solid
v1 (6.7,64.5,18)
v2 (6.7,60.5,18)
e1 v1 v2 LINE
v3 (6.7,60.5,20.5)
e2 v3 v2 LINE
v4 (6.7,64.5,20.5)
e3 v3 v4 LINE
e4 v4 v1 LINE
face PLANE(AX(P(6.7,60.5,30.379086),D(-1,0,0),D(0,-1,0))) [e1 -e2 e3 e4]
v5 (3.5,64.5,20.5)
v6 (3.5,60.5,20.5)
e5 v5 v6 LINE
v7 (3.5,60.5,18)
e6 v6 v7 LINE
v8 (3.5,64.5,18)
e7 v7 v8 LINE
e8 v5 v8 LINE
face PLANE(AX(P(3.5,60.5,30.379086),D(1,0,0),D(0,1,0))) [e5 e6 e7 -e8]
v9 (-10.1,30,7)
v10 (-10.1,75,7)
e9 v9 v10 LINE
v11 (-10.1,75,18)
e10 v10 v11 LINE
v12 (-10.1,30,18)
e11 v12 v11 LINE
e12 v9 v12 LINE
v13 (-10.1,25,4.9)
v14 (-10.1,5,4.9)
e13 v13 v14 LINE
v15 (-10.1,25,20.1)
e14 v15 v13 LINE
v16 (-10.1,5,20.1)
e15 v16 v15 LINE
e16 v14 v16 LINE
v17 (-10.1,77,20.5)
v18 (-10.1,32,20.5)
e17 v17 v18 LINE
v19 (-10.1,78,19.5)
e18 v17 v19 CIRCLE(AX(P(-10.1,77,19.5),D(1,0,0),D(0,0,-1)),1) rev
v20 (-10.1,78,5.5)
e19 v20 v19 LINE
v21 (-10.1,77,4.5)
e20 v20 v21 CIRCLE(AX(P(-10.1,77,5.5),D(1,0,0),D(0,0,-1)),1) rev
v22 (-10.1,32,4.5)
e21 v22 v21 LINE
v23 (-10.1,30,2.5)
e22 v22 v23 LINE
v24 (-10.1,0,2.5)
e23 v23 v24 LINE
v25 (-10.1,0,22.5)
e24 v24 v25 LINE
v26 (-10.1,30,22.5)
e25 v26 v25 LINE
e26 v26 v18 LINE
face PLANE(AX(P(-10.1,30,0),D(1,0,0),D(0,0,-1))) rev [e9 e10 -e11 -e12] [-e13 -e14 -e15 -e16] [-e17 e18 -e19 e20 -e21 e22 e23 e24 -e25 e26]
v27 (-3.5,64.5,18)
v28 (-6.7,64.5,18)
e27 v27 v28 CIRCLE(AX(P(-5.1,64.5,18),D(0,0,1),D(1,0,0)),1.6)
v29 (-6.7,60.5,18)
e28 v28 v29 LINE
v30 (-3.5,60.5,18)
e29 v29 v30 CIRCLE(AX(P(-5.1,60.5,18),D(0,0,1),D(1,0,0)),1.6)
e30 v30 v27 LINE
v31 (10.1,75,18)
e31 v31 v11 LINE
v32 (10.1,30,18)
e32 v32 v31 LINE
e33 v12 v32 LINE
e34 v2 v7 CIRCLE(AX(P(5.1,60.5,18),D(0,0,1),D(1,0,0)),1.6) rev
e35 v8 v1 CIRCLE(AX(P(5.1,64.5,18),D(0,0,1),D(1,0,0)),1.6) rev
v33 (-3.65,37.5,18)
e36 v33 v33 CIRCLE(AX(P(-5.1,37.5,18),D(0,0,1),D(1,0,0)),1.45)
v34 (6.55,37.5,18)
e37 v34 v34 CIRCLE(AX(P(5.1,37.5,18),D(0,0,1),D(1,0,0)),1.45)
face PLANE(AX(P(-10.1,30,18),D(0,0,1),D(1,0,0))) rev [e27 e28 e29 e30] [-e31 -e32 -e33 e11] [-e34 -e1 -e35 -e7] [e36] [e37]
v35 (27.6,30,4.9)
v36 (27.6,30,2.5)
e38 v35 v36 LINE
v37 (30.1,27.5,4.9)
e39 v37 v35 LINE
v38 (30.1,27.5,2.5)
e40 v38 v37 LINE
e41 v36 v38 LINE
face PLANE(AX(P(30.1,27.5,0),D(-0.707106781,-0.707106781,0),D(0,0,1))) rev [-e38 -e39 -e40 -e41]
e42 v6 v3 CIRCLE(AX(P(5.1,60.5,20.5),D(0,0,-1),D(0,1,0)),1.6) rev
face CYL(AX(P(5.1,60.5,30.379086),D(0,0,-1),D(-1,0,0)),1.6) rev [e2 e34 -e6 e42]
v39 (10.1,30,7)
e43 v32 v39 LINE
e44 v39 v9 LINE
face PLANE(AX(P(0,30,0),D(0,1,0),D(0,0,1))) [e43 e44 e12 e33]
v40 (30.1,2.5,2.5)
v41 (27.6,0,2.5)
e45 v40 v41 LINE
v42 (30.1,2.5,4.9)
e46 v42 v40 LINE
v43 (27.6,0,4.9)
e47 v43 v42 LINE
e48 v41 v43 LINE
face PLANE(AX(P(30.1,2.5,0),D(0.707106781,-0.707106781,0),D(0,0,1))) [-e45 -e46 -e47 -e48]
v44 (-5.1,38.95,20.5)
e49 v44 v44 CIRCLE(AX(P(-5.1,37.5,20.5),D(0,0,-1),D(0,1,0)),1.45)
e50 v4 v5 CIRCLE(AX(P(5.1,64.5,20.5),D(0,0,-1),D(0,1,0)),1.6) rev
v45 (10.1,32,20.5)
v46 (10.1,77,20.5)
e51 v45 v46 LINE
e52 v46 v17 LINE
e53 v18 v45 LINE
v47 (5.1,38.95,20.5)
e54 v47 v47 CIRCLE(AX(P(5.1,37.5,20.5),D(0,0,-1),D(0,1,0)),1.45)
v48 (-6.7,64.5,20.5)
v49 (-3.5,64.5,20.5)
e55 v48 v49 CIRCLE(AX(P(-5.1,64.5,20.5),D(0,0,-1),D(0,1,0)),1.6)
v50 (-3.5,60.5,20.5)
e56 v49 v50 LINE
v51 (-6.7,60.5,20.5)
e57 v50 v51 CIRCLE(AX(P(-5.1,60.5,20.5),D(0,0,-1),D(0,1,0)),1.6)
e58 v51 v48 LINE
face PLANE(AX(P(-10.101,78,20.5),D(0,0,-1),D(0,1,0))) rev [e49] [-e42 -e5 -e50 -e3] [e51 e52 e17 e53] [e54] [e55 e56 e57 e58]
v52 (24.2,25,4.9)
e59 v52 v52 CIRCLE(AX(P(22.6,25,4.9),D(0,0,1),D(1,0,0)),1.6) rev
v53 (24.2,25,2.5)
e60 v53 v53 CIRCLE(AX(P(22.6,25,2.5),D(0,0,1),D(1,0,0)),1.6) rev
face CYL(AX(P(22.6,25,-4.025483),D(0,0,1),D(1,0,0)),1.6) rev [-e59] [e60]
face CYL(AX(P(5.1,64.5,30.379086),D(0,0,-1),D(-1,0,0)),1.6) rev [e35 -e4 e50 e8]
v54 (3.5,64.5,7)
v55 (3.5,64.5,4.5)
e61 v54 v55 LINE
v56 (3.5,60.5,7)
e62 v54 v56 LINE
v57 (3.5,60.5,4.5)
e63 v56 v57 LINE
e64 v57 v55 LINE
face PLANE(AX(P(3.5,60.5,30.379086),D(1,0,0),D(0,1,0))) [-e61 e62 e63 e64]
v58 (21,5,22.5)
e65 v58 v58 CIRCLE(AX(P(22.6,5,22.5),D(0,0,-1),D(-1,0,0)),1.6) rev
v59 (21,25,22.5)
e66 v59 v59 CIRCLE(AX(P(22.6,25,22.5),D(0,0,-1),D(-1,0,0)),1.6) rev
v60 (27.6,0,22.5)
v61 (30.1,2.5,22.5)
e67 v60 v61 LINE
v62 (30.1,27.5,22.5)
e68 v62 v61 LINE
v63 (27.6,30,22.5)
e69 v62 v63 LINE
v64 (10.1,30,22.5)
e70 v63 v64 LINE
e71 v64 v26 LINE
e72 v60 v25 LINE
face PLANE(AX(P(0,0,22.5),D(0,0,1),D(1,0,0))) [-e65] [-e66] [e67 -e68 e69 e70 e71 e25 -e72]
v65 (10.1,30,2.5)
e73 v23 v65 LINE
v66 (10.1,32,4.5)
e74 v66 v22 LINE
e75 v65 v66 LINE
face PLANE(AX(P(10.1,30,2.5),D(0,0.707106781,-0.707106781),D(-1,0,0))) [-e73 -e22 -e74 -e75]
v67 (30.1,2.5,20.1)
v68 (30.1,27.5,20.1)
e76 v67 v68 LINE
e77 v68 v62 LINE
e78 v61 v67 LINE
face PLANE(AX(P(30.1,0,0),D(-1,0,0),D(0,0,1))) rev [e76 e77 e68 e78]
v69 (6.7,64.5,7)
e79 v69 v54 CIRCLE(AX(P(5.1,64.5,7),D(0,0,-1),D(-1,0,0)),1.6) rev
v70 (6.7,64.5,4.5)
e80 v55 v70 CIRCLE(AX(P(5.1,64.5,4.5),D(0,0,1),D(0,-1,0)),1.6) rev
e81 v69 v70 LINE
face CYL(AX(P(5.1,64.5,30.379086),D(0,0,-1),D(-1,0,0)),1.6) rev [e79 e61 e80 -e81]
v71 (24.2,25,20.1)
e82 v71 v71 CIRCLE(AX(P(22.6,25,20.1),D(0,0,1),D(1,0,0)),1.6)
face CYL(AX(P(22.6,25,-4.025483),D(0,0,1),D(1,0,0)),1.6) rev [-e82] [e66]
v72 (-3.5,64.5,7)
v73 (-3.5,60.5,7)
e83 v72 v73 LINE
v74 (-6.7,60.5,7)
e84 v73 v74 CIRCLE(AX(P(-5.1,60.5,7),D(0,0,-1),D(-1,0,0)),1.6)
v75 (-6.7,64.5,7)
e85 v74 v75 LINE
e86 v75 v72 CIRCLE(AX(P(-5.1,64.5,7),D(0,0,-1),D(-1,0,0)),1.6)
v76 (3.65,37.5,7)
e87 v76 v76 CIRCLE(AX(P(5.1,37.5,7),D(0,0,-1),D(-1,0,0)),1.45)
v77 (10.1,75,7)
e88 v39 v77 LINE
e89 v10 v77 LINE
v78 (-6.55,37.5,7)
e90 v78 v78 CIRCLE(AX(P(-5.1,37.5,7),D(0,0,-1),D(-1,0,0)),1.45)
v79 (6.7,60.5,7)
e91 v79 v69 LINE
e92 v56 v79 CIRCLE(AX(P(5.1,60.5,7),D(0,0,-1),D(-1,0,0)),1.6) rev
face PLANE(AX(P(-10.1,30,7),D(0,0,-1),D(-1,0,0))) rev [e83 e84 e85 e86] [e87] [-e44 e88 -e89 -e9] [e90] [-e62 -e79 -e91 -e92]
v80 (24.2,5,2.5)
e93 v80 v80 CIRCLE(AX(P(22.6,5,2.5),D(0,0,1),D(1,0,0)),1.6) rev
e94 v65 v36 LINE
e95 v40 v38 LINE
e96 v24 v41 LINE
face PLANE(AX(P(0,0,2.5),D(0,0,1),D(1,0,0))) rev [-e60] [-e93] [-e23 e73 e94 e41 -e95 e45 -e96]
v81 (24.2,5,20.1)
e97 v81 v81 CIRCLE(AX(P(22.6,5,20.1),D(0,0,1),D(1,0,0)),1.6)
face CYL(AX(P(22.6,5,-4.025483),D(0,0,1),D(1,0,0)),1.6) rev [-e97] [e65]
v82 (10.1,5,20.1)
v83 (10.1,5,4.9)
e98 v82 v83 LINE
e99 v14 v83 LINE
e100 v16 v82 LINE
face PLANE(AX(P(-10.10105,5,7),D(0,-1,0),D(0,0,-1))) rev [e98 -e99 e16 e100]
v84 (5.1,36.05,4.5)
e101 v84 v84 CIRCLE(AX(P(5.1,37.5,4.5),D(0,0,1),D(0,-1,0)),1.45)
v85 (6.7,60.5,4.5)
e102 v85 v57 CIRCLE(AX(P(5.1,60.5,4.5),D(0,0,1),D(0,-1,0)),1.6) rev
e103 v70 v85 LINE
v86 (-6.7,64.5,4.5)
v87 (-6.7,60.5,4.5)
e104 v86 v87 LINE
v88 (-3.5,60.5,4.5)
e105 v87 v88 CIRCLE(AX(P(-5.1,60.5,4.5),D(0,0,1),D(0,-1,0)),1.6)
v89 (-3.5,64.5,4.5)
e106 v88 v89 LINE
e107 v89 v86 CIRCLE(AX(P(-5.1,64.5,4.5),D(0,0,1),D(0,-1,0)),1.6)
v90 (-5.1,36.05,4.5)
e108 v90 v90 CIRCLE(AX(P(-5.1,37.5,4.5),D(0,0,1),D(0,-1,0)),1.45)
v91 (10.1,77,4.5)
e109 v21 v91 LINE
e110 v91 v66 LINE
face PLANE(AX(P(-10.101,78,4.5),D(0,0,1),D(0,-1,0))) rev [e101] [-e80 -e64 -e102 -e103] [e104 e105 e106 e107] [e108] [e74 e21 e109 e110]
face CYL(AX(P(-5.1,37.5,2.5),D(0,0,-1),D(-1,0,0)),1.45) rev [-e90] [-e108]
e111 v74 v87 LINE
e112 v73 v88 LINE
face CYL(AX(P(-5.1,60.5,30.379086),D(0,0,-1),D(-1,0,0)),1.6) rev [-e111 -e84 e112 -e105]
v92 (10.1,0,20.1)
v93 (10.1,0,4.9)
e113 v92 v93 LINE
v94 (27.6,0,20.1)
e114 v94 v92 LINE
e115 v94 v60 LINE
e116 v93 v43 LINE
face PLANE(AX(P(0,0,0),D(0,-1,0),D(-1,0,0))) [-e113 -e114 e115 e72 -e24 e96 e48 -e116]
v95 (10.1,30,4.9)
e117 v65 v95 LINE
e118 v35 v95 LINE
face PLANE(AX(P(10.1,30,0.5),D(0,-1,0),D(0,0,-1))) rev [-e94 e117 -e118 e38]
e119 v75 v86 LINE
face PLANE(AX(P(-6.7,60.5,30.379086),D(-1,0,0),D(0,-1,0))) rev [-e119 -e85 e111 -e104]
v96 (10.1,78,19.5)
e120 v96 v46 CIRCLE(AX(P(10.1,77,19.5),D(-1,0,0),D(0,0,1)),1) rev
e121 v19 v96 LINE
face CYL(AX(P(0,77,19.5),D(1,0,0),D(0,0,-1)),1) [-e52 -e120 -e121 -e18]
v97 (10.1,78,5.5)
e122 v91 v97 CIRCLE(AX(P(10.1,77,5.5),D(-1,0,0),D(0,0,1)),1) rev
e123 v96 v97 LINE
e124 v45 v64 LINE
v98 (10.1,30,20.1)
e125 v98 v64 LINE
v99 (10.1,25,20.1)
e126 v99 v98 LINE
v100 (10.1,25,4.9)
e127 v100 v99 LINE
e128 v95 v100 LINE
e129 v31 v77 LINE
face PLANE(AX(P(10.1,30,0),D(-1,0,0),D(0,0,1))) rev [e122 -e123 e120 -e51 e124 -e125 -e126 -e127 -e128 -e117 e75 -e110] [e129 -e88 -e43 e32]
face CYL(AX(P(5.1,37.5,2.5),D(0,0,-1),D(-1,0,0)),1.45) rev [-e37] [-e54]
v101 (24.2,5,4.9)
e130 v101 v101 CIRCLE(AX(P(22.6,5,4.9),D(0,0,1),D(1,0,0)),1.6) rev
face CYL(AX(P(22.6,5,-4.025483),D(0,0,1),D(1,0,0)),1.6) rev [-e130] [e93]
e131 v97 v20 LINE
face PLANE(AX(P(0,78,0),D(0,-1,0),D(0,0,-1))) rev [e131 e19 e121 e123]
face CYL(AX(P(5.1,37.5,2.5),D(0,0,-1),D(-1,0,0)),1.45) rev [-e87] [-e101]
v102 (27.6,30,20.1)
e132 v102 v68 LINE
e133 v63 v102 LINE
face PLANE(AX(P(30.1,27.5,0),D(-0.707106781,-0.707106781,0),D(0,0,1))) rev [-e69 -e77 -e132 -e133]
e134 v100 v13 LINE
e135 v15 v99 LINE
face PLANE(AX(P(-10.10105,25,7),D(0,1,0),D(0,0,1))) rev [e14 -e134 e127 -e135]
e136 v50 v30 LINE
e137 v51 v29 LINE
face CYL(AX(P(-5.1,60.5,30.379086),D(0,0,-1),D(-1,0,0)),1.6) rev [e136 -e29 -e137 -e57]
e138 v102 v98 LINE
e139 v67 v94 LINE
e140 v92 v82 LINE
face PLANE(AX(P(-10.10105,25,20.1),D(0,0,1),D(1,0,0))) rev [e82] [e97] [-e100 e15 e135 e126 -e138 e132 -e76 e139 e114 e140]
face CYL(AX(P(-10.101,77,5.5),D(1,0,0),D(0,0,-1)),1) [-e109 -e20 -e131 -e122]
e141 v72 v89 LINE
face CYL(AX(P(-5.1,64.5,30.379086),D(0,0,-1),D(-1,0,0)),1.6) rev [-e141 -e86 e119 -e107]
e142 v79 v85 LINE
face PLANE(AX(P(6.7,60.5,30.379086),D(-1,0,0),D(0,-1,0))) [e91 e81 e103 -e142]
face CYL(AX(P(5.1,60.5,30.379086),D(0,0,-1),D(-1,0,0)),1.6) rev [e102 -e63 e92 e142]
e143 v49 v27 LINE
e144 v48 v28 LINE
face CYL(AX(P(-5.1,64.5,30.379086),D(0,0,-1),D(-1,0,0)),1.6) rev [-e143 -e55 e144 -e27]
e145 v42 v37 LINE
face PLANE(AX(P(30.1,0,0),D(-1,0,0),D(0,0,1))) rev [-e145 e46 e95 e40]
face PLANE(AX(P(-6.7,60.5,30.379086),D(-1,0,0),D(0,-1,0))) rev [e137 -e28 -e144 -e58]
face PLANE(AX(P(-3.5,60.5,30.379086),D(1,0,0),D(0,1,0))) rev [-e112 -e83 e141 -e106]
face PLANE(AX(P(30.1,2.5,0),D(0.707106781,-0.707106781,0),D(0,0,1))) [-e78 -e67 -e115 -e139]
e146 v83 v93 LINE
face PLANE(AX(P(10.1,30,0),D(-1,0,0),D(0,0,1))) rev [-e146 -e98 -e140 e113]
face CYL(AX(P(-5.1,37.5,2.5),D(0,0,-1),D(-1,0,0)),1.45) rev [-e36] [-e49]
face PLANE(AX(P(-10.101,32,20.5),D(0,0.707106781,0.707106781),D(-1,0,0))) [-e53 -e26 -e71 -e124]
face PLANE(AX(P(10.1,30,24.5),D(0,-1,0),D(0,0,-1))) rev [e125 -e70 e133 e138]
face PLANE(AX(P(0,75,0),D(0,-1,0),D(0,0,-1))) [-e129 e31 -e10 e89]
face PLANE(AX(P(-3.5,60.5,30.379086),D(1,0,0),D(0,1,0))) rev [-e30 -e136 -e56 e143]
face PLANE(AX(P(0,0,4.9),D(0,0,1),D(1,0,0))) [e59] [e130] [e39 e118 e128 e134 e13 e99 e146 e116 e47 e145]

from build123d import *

# Parameters (mm, degrees)
EXTRUDE_1_DEPTH      = 30
SKETCH_2_W           = 20.2
SKETCH_2_H           = 50
EXTRUDE_1_2_DEPTH    = 20
SKETCH_3_W           = 20.2
SKETCH_3_H           = 11
CUT_EXTRUDE_1_DEPTH  = 20
CUT_EXTRUDE_2_REACH  = 60.432
SKETCH_4_W           = 11
SKETCH_4_H           = 20
SKETCH_5_W           = 20.2
SKETCH_5_H           = 4.5
EXTRUDE_2_DEPTH      = 25
CUT_EXTRUDE_4_REACH  = 80.275
CUT_EXTRUDE_5_REACH  = 82.278
SKETCH_9_R           = 1.6
SKETCH_10_W          = 20.2
SKETCH_10_H          = 20
EXTRUDE_3_DEPTH      = 3
CUT_EXTRUDE_6_REACH  = 55.965
SKETCH_12_W          = 20.2
SKETCH_12_H          = 30
EXTRUDE_4_DEPTH      = 2
SKETCH_13_W          = 20.2
SKETCH_13_H          = 30
EXTRUDE_5_DEPTH      = 2
CUT_EXTRUDE_START    = -20.2
SKETCH_15_W          = 15.2
SKETCH_15_H          = 20
CUT_EXTRUDE_7_DEPTH  = 20.2
SKETCH_16_W          = 4.4
SKETCH_16_H          = 30
SKETCH_16_W_2        = 5.4
EXTRUDE_6_DEPTH      = 20
CUT_EXTRUDE_8_REACH  = 88.983
SKETCH_17_R          = 1.6
CHAMFER_1_SIZE       = 2.5
CUT_EXTRUDE_9_REACH  = 89.122
SKETCH_18_W          = 46.30929367
SKETCH_18_H          = 3
SKETCH_20_W          = 20.2
SKETCH_20_H          = 20
EXTRUDE_7_DEPTH      = 2.1
SKETCH_21_W          = 20.2
SKETCH_21_H          = 20
EXTRUDE_8_DEPTH      = 2.1
SKETCH_22_W          = 46.206629154
SKETCH_22_H          = 1
CUT_EXTRUDE_10_DEPTH = 30
SKETCH_23_W          = 42.922328926
SKETCH_23_H          = 4
CUT_EXTRUDE_11_DEPTH = 30
CUT_EXTRUDE_12_REACH = 85.656
SKETCH_24_W          = 4
SKETCH_24_H          = 48
SKETCH_25_W          = 15.2
SKETCH_25_H          = 20
CUT_EXTRUDE_13_DEPTH = 20.2
SKETCH_26_W          = 20.2
SKETCH_26_H          = 20
EXTRUDE_9_DEPTH      = 1
CHAMFER_2_SIZE       = 2
FILLET_1_R           = 1
CUT_EXTRUDE_14_DEPTH = 1


with BuildPart() as part:
    # 草图1 → Extrude 1 (new body)
    with BuildSketch(Plane(origin=(0, 0, 0), x_dir=(1, 0, 0), z_dir=(0, 1, 0))):
        Polygon((-7.6, 15), (-7.6, 0), (7.6, 0), (7.6, 15), (10.1, 15), (10.1, -2.5), (-10.1, -2.5), (-10.1, 15), align=None)
    extrude(amount=EXTRUDE_1_DEPTH)

    # 草图2 → Extrude 1 2 (add)
    with BuildSketch(Plane.XY.offset(2.5)):
        with Locations((0, 25)):
            Rectangle(SKETCH_2_W, SKETCH_2_H)
    extrude(amount=EXTRUDE_1_2_DEPTH)

    # 草图3 → 切除-拉伸1 (cut)
    with BuildSketch(Plane(origin=(0, 50, 0), x_dir=(1, 0, 0), z_dir=(0, 1, 0))):
        with Locations((0, -12.5)):
            Rectangle(SKETCH_3_W, SKETCH_3_H)
    extrude(amount=-CUT_EXTRUDE_1_DEPTH, mode=Mode.SUBTRACT)

    # 草图4 → 切除-拉伸2 (cut, up to next)
    with BuildSketch(Plane(origin=(10.1, 0, 0), x_dir=(0, 0, -1), z_dir=(1, 0, 0)), mode=Mode.PRIVATE) as cut_extrude_2_sk1:
        with Locations((-12.5, 15)):
            Rectangle(SKETCH_4_W, SKETCH_4_H)
    cut_extrude_2_tool1 = extrude(cut_extrude_2_sk1.sketch, amount=-CUT_EXTRUDE_2_REACH, mode=Mode.PRIVATE) & part.part
    add(cut_extrude_2_tool1.solids().sort_by_distance((10.1, 15, 12.5))[0], mode=Mode.SUBTRACT)

    # 草图5 → 凸台-拉伸2 (add)
    with BuildSketch(Plane(origin=(0, 50, 0), x_dir=(1, 0, 0), z_dir=(0, 1, 0))):
        with Locations((0, -4.75)):
            Rectangle(SKETCH_5_W, SKETCH_5_H)
        with Locations((0, -20.25)):
            Rectangle(SKETCH_5_W, SKETCH_5_H)
    extrude(amount=EXTRUDE_2_DEPTH)

    # 草图7 → M3.5 螺纹孔1 (revolve, cut)
    with BuildSketch(Plane(origin=(-5.1, 37.5, 2.5), x_dir=(0, 1, 0), z_dir=(1, 0, 0))):
        Polygon((0, 0), (0, 40.871247898), (1.45, 40), (1.45, 0), align=None)
    hole_wizard_m3_5_1 = revolve(axis=Axis((-5.1, 37.5, -3.85), (0, 0, 1)), mode=Mode.SUBTRACT)

    # 切除-拉伸4: up to this face of the body (flat: up to its plane)
    cut_extrude_4_end = Plane(part.part.faces().sort_by_distance((0.022332689, 37.5, 22.5))[0])
    # 草图8 → 切除-拉伸4 (cut, up to the picked face)
    with BuildSketch(Plane(origin=(0, 0, 2.5), x_dir=(-1, 0, 0), z_dir=(0, 0, -1)), mode=Mode.PRIVATE) as cut_extrude_4_sk1:
        with BuildLine():
            Line((3.5, 60.5), (3.5, 64.5))
            ThreePointArc((3.5, 64.5), (5.1, 66.1), (6.7, 64.5))
            Line((6.7, 64.5), (6.7, 60.5))
            ThreePointArc((6.7, 60.5), (5.1, 58.9), (3.5, 60.5))
        make_face()
    cut_extrude_4_tool1 = split(extrude(cut_extrude_4_sk1.sketch, amount=-CUT_EXTRUDE_4_REACH, mode=Mode.PRIVATE), bisect_by=cut_extrude_4_end, keep=Keep.BOTH, mode=Mode.PRIVATE)
    cut_extrude_4 = cut_extrude_4_tool1.solids().sort_by(Axis((-5.1, 62.5, 2.5), (0, 0, 1)))[0]
    add(cut_extrude_4, mode=Mode.SUBTRACT)

    # 草图9 → 切除-拉伸5 (cut, up to next)
    with BuildSketch(Plane(origin=(-7.6, 0, 0), x_dir=(0, 0, -1), z_dir=(1, 0, 0)), mode=Mode.PRIVATE) as cut_extrude_5_sk1:
        with Locations((7.5, 25)):
            Circle(SKETCH_9_R)
    cut_extrude_5_tool1 = extrude(cut_extrude_5_sk1.sketch, amount=-CUT_EXTRUDE_5_REACH, mode=Mode.PRIVATE) & part.part
    # 草图9 → 切除-拉伸5 (cut, up to next)
    with BuildSketch(Plane(origin=(-7.6, 0, 0), x_dir=(0, 0, -1), z_dir=(1, 0, 0)), mode=Mode.PRIVATE) as cut_extrude_5_sk2:
        with Locations((7.5, 5)):
            Circle(SKETCH_9_R)
    cut_extrude_5_tool2 = extrude(cut_extrude_5_sk2.sketch, amount=-CUT_EXTRUDE_5_REACH, mode=Mode.PRIVATE) & part.part
    cut_extrude_5_1 = cut_extrude_5_tool1.solids().sort_by_distance((-7.6, 25, -7.5))[0]
    add(cut_extrude_5_1, mode=Mode.SUBTRACT)
    cut_extrude_5_2 = cut_extrude_5_tool2.solids().sort_by_distance((-7.6, 5, -7.5))[0]
    add(cut_extrude_5_2, mode=Mode.SUBTRACT)
    cut_extrude_5 = cut_extrude_5_1 + cut_extrude_5_2  # 切除-拉伸5 as one shape, for the pattern or mirror that repeats it

    # 镜向1: M3.5 螺纹孔1, 切除-拉伸4, 切除-拉伸5 across plane
    add(hole_wizard_m3_5_1.mirror(Plane(origin=(0, 0, 0), x_dir=(0, 0, 1), z_dir=(1, 0, 0))), mode=Mode.SUBTRACT)
    add(cut_extrude_4.mirror(Plane(origin=(0, 0, 0), x_dir=(0, 0, 1), z_dir=(1, 0, 0))), mode=Mode.SUBTRACT)
    add(cut_extrude_5.mirror(Plane(origin=(0, 0, 0), x_dir=(0, 0, 1), z_dir=(1, 0, 0))), mode=Mode.SUBTRACT)

    # 草图10 → 凸台-拉伸3 (add)
    with BuildSketch(Plane(origin=(0, 75, 0), x_dir=(1, 0, 0), z_dir=(0, 1, 0))):
        with Locations((0, -12.5)):
            Rectangle(SKETCH_10_W, SKETCH_10_H)
    extrude(amount=EXTRUDE_3_DEPTH)

    # 草图11 → 切除-拉伸6 (cut, up to next)
    with BuildSketch(Plane(origin=(0, 30, 0), x_dir=(1, 0, 0), z_dir=(0, 1, 0)), mode=Mode.PRIVATE) as cut_extrude_6_sk1:
        Polygon((10.1, -2.5), (10.1, 15), (7.6, 15), (7.6, 0), (-7.6, 0), (-7.6, 15), (-10.1, 15), (-10.1, -2.5), align=None)
    cut_extrude_6_tool1 = extrude(cut_extrude_6_sk1.sketch, amount=-CUT_EXTRUDE_6_REACH, mode=Mode.PRIVATE) & part.part
    add(cut_extrude_6_tool1.solids().sort_by_distance((9.832738, 30, -6.25))[0], mode=Mode.SUBTRACT)

    # 草图12 → 凸台-拉伸4 (add)
    with BuildSketch(Plane.XY.offset(22.5)):
        with Locations((0, 15)):
            Rectangle(SKETCH_12_W, SKETCH_12_H)
    extrude(amount=EXTRUDE_4_DEPTH)

    # 草图13 → 凸台-拉伸5 (add)
    with BuildSketch(Plane(origin=(0, 0, 2.5), x_dir=(-1, 0, 0), z_dir=(0, 0, -1))):
        with Locations((0, 15)):
            Rectangle(SKETCH_13_W, SKETCH_13_H)
    extrude(amount=EXTRUDE_5_DEPTH)

    # 草图15 → 切除-拉伸7 (cut)
    with BuildSketch(Plane(origin=(10.1, 0, 0), x_dir=(0, 0, -1), z_dir=(1, 0, 0)).offset(CUT_EXTRUDE_START)):
        with Locations((-12.5, 15)):
            Rectangle(SKETCH_15_W, SKETCH_15_H)
    extrude(amount=CUT_EXTRUDE_7_DEPTH, mode=Mode.SUBTRACT)

    # 草图16 → 凸台-拉伸6 (add)
    with BuildSketch(Plane(origin=(10.1, 0, 0), x_dir=(0, 0, -1), z_dir=(1, 0, 0))):
        with Locations((-22.3, 15)):
            Rectangle(SKETCH_16_W, SKETCH_16_H)
        with Locations((-3.2, 15)):
            Rectangle(SKETCH_16_W_2, SKETCH_16_H)
    extrude(amount=EXTRUDE_6_DEPTH)

    # 切除-拉伸8: up to this face of the body (flat: up to its plane)
    cut_extrude_8_end = Plane(part.part.faces().sort_by_distance((10, 15, 0.5))[0])
    # 草图17 → 切除-拉伸8 (cut, up to the picked face)
    with BuildSketch(Plane.XY.offset(24.5), mode=Mode.PRIVATE) as cut_extrude_8_sk1:
        with Locations((22.6, 25)):
            Circle(SKETCH_17_R)
    cut_extrude_8_tool1 = split(extrude(cut_extrude_8_sk1.sketch, amount=-CUT_EXTRUDE_8_REACH, mode=Mode.PRIVATE), bisect_by=cut_extrude_8_end, keep=Keep.BOTH, mode=Mode.PRIVATE)
    # 草图17 → 切除-拉伸8 (cut, up to the picked face)
    with BuildSketch(Plane.XY.offset(24.5), mode=Mode.PRIVATE) as cut_extrude_8_sk2:
        with Locations((22.6, 5)):
            Circle(SKETCH_17_R)
    cut_extrude_8_tool2 = split(extrude(cut_extrude_8_sk2.sketch, amount=-CUT_EXTRUDE_8_REACH, mode=Mode.PRIVATE), bisect_by=cut_extrude_8_end, keep=Keep.BOTH, mode=Mode.PRIVATE)
    add(cut_extrude_8_tool1.solids().sort_by(Axis((22.6, 25, 24.5), (0, 0, -1)))[0], mode=Mode.SUBTRACT)
    add(cut_extrude_8_tool2.solids().sort_by(Axis((22.6, 5, 24.5), (0, 0, -1)))[0], mode=Mode.SUBTRACT)

    # 倒角1
    chamfer_1_edges = [part.edges().sort_by_distance(p)[0] for p in [
        (30.1, 0, 22.3),
        (30.1, 0, 3.2),
        (30.1, 30, 3.2),
        (30.1, 30, 22.3),
    ]]
    chamfer(chamfer_1_edges, length=CHAMFER_1_SIZE)

    # 切除-拉伸9: up to this face of the body (flat: up to its plane)
    cut_extrude_9_end = Plane(part.part.faces().sort_by_distance((0, 78, 12.5))[0])
    # 草图18 → 切除-拉伸9 (cut, up to the picked face)
    with BuildSketch(Plane.XZ, mode=Mode.PRIVATE) as cut_extrude_9_sk1:
        with Locations((8.75, 0.5)):
            Rectangle(SKETCH_18_W, SKETCH_18_H)
    cut_extrude_9_tool1 = split(extrude(cut_extrude_9_sk1.sketch, amount=-CUT_EXTRUDE_9_REACH, mode=Mode.PRIVATE), bisect_by=cut_extrude_9_end, keep=Keep.BOTH, mode=Mode.PRIVATE)
    add(cut_extrude_9_tool1.solids().sort_by(Axis((8.75, 0, 0.5), (0, 1, 0)))[0], mode=Mode.SUBTRACT)

    # 草图20 → 凸台-拉伸7 (add)
    with BuildSketch(Plane.XY.offset(4.9)):
        with Locations((0, 15)):
            Rectangle(SKETCH_20_W, SKETCH_20_H)
    extrude(amount=EXTRUDE_7_DEPTH)

    # 草图21 → 凸台-拉伸8 (add)
    with BuildSketch(Plane(origin=(0, 0, 20.1), x_dir=(-1, 0, 0), z_dir=(0, 0, -1))):
        with Locations((0, 15)):
            Rectangle(SKETCH_21_W, SKETCH_21_H)
    extrude(amount=EXTRUDE_8_DEPTH)

    # 草图22 → 切除-拉伸10 (cut)
    with BuildSketch(Plane(origin=(0, 30, 0), x_dir=(1, 0, 0), z_dir=(0, 1, 0))):
        with Locations((8.75, -2)):
            Rectangle(SKETCH_22_W, SKETCH_22_H)
    extrude(amount=-CUT_EXTRUDE_10_DEPTH, mode=Mode.SUBTRACT)

    # 草图23 → 切除-拉伸11 (cut)
    with BuildSketch(Plane(origin=(0, 30, 0), x_dir=(1, 0, 0), z_dir=(0, 1, 0))):
        with Locations((8.75, -24.5)):
            Rectangle(SKETCH_23_W, SKETCH_23_H)
    extrude(amount=-CUT_EXTRUDE_11_DEPTH, mode=Mode.SUBTRACT)

    # 草图24 → 切除-拉伸12 (cut, up to next)
    with BuildSketch(Plane(origin=(10.1, 0, 0), x_dir=(0, 0, -1), z_dir=(1, 0, 0)), mode=Mode.PRIVATE) as cut_extrude_12_sk1:
        with Locations((-22.5, 54)):
            Rectangle(SKETCH_24_W, SKETCH_24_H)
    cut_extrude_12_tool1 = extrude(cut_extrude_12_sk1.sketch, amount=-CUT_EXTRUDE_12_REACH, mode=Mode.PRIVATE) & part.part
    # 草图24 → 切除-拉伸12 (cut, up to next)
    with BuildSketch(Plane(origin=(10.1, 0, 0), x_dir=(0, 0, -1), z_dir=(1, 0, 0)), mode=Mode.PRIVATE) as cut_extrude_12_sk2:
        with Locations((-2.5, 54)):
            Rectangle(SKETCH_24_W, SKETCH_24_H)
    cut_extrude_12_tool2 = extrude(cut_extrude_12_sk2.sketch, amount=-CUT_EXTRUDE_12_REACH, mode=Mode.PRIVATE) & part.part
    add(cut_extrude_12_tool1.solids().sort_by_distance((10.1, 54, 22.5))[0], mode=Mode.SUBTRACT)
    add(cut_extrude_12_tool2.solids().sort_by_distance((10.1, 54, 2.5))[0], mode=Mode.SUBTRACT)

    # 草图25 → 切除-拉伸13 (cut)
    with BuildSketch(Plane(origin=(10.1, 0, 0), x_dir=(0, 0, -1), z_dir=(1, 0, 0)).offset(CUT_EXTRUDE_START)):
        with Locations((-12.5, 15)):
            Rectangle(SKETCH_25_W, SKETCH_25_H)
    extrude(amount=CUT_EXTRUDE_13_DEPTH, mode=Mode.SUBTRACT)

    # 草图26 → 凸台-拉伸9 (add)
    with BuildSketch(Plane.XY.offset(4.9)):
        with Locations((0, 15)):
            Rectangle(SKETCH_26_W, SKETCH_26_H)
    extrude(amount=EXTRUDE_9_DEPTH)

    # 倒角2
    chamfer_2_edges = [part.edges().sort_by_distance(p)[0] for p in [
        (0, 30, 4.5),
        (0, 30, 20.5),
    ]]
    chamfer(chamfer_2_edges, length=CHAMFER_2_SIZE - 0.0001)  # a hair under: the kernel refuses the full size

    # 圆角1
    fillet_1_edges = [part.edges().sort_by_distance(p)[0] for p in [
        (0, 78, 20.5),
        (0, 78, 4.5),
    ]]
    fillet(fillet_1_edges, radius=FILLET_1_R)

    # 草图27 → 切除-拉伸14 (cut)
    with BuildSketch(Plane.XY.offset(5.9)):
        Polygon((10.1, 0), (27.6, 0), (30.1, 2.5), (30.1, 27.5), (27.6, 30), (10.1, 30), (10.1, 25), (-10.1, 25), (-10.1, 5), (10.1, 5), align=None)
    extrude(amount=-CUT_EXTRUDE_14_DEPTH, mode=Mode.SUBTRACT)


solid = part.part
